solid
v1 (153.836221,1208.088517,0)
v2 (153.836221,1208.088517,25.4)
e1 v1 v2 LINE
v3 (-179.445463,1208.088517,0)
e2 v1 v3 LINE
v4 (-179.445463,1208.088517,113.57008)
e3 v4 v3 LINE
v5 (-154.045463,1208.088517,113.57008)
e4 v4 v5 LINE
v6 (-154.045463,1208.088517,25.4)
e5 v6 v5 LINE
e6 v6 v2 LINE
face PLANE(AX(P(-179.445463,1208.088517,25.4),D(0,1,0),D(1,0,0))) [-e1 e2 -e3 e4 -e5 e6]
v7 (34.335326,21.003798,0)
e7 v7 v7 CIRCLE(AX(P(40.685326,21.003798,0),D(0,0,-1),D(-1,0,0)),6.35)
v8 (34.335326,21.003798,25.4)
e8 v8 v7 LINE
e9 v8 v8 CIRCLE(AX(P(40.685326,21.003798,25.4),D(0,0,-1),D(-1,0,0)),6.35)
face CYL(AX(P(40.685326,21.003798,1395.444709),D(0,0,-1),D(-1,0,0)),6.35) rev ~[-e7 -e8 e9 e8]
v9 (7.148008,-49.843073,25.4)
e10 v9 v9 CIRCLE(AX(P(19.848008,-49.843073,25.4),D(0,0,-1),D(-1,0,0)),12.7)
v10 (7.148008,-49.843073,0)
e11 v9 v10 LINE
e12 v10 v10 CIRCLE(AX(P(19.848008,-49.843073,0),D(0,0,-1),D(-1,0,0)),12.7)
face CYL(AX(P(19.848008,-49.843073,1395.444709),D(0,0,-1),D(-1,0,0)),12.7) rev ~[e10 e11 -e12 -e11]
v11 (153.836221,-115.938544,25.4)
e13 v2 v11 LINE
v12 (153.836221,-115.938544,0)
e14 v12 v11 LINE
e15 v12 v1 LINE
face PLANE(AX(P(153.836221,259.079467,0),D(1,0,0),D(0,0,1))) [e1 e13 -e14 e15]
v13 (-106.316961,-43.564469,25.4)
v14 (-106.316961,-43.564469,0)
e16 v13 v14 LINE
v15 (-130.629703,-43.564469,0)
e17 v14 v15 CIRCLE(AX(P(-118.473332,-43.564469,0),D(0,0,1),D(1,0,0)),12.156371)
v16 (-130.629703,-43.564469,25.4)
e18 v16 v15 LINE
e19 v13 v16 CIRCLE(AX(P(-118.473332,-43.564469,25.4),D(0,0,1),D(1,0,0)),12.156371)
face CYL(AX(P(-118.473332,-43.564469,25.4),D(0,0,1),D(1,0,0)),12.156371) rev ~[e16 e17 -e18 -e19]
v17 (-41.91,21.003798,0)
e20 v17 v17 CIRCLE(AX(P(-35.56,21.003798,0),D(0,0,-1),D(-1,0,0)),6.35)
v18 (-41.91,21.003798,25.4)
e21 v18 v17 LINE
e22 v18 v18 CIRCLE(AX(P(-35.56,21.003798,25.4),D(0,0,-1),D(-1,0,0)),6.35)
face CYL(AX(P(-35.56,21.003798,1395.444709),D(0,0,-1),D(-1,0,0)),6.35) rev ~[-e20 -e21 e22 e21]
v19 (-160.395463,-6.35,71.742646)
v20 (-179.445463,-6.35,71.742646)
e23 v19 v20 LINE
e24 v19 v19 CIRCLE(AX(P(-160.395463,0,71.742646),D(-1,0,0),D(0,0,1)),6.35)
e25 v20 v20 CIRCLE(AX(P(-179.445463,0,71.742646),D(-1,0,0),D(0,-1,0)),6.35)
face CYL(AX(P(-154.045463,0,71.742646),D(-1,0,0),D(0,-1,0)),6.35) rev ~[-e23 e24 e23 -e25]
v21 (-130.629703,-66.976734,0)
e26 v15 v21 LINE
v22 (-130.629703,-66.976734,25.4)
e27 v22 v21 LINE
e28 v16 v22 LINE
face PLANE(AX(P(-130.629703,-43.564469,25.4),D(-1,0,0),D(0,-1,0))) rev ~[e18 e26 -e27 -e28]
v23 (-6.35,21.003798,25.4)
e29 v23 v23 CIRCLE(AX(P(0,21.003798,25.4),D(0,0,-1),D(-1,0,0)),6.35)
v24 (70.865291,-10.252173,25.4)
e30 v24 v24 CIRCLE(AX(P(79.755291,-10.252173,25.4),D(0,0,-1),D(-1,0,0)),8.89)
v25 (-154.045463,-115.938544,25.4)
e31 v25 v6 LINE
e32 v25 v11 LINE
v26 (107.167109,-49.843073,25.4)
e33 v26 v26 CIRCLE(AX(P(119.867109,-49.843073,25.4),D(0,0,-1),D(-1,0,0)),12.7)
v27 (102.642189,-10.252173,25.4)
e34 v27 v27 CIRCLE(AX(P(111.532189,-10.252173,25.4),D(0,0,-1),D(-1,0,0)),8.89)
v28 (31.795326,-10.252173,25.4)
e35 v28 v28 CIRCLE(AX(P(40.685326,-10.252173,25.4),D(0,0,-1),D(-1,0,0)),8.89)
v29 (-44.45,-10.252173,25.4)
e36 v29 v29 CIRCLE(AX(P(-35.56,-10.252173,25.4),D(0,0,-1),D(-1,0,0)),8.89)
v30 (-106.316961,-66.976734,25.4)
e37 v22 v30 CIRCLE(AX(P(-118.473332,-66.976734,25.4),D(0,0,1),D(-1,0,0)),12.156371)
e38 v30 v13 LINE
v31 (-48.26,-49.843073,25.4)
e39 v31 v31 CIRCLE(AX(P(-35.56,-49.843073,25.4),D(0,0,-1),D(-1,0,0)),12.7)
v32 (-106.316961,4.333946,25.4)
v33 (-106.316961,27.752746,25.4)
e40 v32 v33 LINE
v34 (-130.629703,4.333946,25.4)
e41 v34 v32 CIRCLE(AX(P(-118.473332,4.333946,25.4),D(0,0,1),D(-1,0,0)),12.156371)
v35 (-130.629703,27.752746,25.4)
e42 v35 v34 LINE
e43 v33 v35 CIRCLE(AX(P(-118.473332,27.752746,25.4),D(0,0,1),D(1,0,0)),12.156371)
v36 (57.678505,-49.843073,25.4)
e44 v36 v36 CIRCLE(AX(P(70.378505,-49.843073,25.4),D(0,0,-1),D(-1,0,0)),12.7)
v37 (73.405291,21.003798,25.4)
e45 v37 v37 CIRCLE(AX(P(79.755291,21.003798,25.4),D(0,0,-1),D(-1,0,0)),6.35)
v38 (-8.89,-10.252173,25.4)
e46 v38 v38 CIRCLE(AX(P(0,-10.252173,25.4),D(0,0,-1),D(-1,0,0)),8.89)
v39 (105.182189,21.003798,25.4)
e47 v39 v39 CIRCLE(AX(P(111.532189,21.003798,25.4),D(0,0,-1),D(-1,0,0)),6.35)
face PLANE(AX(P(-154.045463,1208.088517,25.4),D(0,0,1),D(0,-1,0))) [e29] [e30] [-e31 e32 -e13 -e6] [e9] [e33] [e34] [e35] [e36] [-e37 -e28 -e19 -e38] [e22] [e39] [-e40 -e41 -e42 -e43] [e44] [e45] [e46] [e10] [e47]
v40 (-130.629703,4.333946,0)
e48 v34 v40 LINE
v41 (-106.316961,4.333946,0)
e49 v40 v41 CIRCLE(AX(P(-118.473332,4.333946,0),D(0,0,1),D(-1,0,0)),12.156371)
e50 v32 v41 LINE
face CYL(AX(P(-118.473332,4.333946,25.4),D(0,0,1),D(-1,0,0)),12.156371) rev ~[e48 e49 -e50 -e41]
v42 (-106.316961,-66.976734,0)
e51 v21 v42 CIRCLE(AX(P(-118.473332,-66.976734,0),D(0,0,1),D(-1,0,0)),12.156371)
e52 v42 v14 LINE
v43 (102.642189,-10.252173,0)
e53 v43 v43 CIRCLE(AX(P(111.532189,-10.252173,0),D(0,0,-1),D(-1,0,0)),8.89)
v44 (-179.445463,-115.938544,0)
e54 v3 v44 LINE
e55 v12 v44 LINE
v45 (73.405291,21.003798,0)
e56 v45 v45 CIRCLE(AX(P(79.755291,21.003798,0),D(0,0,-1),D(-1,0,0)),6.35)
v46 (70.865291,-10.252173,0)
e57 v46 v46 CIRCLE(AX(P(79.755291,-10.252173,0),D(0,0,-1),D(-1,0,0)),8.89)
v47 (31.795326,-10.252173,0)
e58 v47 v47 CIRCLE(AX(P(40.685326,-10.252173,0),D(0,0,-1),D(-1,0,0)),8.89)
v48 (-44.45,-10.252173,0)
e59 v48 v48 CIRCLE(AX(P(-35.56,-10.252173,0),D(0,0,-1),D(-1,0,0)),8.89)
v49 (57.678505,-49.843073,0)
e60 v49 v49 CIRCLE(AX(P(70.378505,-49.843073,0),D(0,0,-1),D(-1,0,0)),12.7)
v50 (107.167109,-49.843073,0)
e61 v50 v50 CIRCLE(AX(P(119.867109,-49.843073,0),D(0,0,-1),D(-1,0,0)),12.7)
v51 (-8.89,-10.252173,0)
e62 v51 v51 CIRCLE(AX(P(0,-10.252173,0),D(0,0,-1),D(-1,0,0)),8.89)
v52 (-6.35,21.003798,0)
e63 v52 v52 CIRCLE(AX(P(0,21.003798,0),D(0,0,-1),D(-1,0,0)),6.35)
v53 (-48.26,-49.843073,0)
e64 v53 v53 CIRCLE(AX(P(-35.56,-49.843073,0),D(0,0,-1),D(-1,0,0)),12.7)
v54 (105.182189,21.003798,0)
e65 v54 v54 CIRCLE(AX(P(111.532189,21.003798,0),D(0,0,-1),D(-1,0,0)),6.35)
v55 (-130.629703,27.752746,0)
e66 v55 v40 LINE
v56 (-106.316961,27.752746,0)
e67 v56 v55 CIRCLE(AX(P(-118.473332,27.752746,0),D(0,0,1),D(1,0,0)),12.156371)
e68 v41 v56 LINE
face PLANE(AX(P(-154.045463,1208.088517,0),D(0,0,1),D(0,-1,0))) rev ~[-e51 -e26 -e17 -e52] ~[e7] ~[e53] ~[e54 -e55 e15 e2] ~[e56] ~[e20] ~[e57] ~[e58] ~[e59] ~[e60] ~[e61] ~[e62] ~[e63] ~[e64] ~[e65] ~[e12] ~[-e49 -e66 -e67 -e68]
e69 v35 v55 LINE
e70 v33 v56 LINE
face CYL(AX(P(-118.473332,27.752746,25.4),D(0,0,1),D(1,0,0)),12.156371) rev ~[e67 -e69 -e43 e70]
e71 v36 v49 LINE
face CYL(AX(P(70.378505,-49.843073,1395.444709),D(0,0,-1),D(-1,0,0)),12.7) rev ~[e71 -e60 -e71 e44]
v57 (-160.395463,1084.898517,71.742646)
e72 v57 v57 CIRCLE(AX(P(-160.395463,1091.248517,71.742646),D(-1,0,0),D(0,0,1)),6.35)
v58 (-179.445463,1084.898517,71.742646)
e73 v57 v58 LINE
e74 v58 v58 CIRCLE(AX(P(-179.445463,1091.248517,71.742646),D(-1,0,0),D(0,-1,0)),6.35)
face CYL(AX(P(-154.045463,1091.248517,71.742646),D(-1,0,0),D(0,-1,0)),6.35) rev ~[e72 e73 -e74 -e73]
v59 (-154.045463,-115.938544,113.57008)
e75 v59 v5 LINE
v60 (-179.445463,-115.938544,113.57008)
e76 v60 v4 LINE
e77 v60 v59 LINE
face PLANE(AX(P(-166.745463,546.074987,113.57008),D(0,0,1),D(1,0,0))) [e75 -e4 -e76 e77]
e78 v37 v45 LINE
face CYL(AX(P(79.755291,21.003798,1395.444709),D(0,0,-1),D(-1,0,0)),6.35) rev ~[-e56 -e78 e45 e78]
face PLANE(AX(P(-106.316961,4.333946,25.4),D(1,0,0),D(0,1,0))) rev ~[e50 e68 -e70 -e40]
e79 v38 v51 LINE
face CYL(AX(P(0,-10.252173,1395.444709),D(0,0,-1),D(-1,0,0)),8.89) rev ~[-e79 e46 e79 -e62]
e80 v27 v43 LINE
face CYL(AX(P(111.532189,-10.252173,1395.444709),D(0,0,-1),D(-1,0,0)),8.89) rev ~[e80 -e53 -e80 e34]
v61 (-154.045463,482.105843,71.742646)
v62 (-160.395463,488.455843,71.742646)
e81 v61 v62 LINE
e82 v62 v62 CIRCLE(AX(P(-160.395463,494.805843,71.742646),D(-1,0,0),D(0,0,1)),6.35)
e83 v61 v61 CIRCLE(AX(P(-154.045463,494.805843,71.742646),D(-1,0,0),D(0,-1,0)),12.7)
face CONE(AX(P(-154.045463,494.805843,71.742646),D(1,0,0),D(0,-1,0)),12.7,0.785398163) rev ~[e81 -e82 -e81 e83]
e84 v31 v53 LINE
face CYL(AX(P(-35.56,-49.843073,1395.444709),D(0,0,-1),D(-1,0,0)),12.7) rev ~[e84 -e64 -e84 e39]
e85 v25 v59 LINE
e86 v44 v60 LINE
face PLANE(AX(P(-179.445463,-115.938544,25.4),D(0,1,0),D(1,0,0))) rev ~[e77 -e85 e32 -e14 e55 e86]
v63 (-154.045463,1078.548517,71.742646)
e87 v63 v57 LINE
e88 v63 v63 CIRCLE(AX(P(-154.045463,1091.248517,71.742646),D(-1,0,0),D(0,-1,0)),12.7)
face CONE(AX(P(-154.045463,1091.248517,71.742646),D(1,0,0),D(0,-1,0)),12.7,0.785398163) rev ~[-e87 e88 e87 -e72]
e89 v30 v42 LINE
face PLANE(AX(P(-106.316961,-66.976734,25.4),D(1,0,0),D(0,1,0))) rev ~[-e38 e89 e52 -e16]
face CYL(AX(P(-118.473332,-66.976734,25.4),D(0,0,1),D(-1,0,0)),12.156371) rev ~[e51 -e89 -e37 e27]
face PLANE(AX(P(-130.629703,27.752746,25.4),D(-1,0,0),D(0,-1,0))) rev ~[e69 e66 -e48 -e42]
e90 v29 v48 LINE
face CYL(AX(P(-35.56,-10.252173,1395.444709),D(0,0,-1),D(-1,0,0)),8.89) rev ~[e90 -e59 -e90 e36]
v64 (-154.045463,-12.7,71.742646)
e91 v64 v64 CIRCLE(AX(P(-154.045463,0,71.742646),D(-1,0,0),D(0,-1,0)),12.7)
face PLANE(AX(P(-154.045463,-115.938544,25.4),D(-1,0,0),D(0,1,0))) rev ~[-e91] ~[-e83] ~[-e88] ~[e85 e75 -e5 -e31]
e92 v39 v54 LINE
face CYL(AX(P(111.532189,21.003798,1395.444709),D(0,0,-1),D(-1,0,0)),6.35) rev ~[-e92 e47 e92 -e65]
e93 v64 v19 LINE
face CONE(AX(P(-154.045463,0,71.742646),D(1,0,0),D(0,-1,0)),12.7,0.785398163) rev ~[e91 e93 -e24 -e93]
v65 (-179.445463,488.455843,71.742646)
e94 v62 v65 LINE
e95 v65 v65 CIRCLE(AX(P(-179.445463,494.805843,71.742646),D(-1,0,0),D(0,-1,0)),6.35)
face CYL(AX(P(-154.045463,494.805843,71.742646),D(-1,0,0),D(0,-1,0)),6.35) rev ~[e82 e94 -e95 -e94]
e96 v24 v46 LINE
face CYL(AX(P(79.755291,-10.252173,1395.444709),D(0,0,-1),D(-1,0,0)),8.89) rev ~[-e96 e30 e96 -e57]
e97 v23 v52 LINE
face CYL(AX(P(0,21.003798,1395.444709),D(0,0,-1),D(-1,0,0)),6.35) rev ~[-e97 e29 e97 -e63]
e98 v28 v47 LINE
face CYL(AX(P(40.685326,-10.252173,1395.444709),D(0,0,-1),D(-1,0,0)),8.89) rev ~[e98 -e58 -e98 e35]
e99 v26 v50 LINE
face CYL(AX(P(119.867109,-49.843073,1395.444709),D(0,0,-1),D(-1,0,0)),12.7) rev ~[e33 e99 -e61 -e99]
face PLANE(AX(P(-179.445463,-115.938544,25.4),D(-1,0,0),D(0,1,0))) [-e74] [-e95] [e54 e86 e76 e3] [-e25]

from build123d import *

# Parameters (mm, degrees)
F0_W            = 307.8816831112
F0_H            = 200.2553716302
F1_DEPTH        = 25.4
F2_W            = 307.8816831112
F2_H            = 25.4
F3_DEPTH        = 174.76264
F4_DEPTH        = 949.00905
F5_W            = 1324.0270616302
F5_H            = 25.4
F6_DEPTH        = 25.4
F7_W            = 25.4
F7_H            = 1324.0270616302
F8_DEPTH        = 88.17008
F10_D           = 12.7
F10_CSINK_D     = 25.4
F10_CSINK_ANGLE = 90
F12_D           = 12.7
F13_D           = 17.78
F14_D           = 25.4
F15_DEPTH       = 25.4


with BuildPart() as f1:
    # F0 (on Top) → F1 (new body)
    with BuildSketch(Plane.XY):
        with Locations((-0.1046210527, -15.8108584583)):
            Rectangle(F0_W, F0_H)
    extrude(amount=F1_DEPTH)

    # F2 (on face) → F3 (join)
    with BuildSketch(Plane(origin=(0, 84.3168273568, 0), x_dir=(-1, 0, 0), z_dir=(0, 1, 0))):
        with Locations((0.1046210527, 12.7)):
            Rectangle(F2_W, F2_H)
    extrude(amount=F3_DEPTH)

    # F4 (add): a face of the model
    f4_faces = [f1.faces().sort_by_distance(p)[0] for p in [
        (-0.1046210527, 259.0794673568, 12.7),
    ]]
    extrude(f4_faces, amount=F4_DEPTH)

    # F5 (on face) → F6 (join)
    with BuildSketch(Plane(origin=(-154.0454626083, 0, 0), x_dir=(0, -1, 0), z_dir=(-1, 0, 0))):
        with Locations((-546.0749865417, 12.7)):
            Rectangle(F5_W, F5_H)
    extrude(amount=F6_DEPTH)

    # F7 (on face) → F8 (join)
    with BuildSketch(Plane.XY.offset(25.4)):
        with Locations((-166.7454626083, 546.0749865417)):
            Rectangle(F7_W, F7_H)
    extrude(amount=F8_DEPTH)

    # F10 (through all)
    with Locations(Plane.YZ.offset(-154.0454626083)):
        with Locations((0, 71.7426463962), (494.805842638, 71.7426463962), (1091.2485173568, 71.7426463962)):
            CounterSinkHole(F10_D / 2, F10_CSINK_D / 2, counter_sink_angle=F10_CSINK_ANGLE)

    # F12 (through all)
    with Locations(Plane.XY.offset(25.4)):
        with Locations((-35.56, 21.0037976503), (0, 21.0037976503), (40.685325861, 21.0037976503), (79.7552913427, 21.0037976503), (111.532188952, 21.0037976503)):
            Hole(F12_D / 2)

    # F13 (through all)
    with Locations(Plane.XY.offset(25.4)):
        with Locations((-35.56, -10.2521730587), (0, -10.2521730587), (40.685325861, -10.2521730587), (79.7552913427, -10.2521730587), (111.532188952, -10.2521730587)):
            Hole(F13_D / 2)

    # F14 (through all)
    with Locations(Plane.XY.offset(25.4)):
        with Locations((-35.56, -49.8430728912), (19.8480077088, -49.8430728912), (70.3785046935, -49.8430728912), (119.8671087623, -49.8430728912)):
            Hole(F14_D / 2)

    # F11 (on face) → F15 (cut)
    with BuildSketch(Plane.XY.offset(25.4)):
        with BuildLine():
            Line((-130.6297034025, 27.7527463882), (-130.6297034025, 4.3339463882))
            ThreePointArc((-130.6297034025, 4.3339463882), (-118.4733323753, -7.822424639), (-106.3169613481, 4.3339463882))
            Line((-106.3169613481, 4.3339463882), (-106.3169613481, 27.7527463882))
            ThreePointArc((-106.3169613481, 27.7527463882), (-118.4733323753, 39.9091174154), (-130.6297034025, 27.7527463882))
        make_face()
        with BuildLine():
            ThreePointArc((-106.3169613481, -43.5644686222), (-118.4733323753, -31.408097595), (-130.6297034025, -43.5644686222))
            Line((-130.6297034025, -43.5644686222), (-130.6297034025, -63.3748397231))
            Line((-130.6297034025, -63.3748397231), (-130.6297034025, -66.9767335057))
            ThreePointArc((-130.6297034025, -66.9767335057), (-118.4733323753, -79.133104533), (-106.3169613481, -66.9767335057))
            Line((-106.3169613481, -66.9767335057), (-106.3169613481, -43.5644686222))
        make_face()
    extrude(amount=-F15_DEPTH, mode=Mode.SUBTRACT)


solid = f1.part
